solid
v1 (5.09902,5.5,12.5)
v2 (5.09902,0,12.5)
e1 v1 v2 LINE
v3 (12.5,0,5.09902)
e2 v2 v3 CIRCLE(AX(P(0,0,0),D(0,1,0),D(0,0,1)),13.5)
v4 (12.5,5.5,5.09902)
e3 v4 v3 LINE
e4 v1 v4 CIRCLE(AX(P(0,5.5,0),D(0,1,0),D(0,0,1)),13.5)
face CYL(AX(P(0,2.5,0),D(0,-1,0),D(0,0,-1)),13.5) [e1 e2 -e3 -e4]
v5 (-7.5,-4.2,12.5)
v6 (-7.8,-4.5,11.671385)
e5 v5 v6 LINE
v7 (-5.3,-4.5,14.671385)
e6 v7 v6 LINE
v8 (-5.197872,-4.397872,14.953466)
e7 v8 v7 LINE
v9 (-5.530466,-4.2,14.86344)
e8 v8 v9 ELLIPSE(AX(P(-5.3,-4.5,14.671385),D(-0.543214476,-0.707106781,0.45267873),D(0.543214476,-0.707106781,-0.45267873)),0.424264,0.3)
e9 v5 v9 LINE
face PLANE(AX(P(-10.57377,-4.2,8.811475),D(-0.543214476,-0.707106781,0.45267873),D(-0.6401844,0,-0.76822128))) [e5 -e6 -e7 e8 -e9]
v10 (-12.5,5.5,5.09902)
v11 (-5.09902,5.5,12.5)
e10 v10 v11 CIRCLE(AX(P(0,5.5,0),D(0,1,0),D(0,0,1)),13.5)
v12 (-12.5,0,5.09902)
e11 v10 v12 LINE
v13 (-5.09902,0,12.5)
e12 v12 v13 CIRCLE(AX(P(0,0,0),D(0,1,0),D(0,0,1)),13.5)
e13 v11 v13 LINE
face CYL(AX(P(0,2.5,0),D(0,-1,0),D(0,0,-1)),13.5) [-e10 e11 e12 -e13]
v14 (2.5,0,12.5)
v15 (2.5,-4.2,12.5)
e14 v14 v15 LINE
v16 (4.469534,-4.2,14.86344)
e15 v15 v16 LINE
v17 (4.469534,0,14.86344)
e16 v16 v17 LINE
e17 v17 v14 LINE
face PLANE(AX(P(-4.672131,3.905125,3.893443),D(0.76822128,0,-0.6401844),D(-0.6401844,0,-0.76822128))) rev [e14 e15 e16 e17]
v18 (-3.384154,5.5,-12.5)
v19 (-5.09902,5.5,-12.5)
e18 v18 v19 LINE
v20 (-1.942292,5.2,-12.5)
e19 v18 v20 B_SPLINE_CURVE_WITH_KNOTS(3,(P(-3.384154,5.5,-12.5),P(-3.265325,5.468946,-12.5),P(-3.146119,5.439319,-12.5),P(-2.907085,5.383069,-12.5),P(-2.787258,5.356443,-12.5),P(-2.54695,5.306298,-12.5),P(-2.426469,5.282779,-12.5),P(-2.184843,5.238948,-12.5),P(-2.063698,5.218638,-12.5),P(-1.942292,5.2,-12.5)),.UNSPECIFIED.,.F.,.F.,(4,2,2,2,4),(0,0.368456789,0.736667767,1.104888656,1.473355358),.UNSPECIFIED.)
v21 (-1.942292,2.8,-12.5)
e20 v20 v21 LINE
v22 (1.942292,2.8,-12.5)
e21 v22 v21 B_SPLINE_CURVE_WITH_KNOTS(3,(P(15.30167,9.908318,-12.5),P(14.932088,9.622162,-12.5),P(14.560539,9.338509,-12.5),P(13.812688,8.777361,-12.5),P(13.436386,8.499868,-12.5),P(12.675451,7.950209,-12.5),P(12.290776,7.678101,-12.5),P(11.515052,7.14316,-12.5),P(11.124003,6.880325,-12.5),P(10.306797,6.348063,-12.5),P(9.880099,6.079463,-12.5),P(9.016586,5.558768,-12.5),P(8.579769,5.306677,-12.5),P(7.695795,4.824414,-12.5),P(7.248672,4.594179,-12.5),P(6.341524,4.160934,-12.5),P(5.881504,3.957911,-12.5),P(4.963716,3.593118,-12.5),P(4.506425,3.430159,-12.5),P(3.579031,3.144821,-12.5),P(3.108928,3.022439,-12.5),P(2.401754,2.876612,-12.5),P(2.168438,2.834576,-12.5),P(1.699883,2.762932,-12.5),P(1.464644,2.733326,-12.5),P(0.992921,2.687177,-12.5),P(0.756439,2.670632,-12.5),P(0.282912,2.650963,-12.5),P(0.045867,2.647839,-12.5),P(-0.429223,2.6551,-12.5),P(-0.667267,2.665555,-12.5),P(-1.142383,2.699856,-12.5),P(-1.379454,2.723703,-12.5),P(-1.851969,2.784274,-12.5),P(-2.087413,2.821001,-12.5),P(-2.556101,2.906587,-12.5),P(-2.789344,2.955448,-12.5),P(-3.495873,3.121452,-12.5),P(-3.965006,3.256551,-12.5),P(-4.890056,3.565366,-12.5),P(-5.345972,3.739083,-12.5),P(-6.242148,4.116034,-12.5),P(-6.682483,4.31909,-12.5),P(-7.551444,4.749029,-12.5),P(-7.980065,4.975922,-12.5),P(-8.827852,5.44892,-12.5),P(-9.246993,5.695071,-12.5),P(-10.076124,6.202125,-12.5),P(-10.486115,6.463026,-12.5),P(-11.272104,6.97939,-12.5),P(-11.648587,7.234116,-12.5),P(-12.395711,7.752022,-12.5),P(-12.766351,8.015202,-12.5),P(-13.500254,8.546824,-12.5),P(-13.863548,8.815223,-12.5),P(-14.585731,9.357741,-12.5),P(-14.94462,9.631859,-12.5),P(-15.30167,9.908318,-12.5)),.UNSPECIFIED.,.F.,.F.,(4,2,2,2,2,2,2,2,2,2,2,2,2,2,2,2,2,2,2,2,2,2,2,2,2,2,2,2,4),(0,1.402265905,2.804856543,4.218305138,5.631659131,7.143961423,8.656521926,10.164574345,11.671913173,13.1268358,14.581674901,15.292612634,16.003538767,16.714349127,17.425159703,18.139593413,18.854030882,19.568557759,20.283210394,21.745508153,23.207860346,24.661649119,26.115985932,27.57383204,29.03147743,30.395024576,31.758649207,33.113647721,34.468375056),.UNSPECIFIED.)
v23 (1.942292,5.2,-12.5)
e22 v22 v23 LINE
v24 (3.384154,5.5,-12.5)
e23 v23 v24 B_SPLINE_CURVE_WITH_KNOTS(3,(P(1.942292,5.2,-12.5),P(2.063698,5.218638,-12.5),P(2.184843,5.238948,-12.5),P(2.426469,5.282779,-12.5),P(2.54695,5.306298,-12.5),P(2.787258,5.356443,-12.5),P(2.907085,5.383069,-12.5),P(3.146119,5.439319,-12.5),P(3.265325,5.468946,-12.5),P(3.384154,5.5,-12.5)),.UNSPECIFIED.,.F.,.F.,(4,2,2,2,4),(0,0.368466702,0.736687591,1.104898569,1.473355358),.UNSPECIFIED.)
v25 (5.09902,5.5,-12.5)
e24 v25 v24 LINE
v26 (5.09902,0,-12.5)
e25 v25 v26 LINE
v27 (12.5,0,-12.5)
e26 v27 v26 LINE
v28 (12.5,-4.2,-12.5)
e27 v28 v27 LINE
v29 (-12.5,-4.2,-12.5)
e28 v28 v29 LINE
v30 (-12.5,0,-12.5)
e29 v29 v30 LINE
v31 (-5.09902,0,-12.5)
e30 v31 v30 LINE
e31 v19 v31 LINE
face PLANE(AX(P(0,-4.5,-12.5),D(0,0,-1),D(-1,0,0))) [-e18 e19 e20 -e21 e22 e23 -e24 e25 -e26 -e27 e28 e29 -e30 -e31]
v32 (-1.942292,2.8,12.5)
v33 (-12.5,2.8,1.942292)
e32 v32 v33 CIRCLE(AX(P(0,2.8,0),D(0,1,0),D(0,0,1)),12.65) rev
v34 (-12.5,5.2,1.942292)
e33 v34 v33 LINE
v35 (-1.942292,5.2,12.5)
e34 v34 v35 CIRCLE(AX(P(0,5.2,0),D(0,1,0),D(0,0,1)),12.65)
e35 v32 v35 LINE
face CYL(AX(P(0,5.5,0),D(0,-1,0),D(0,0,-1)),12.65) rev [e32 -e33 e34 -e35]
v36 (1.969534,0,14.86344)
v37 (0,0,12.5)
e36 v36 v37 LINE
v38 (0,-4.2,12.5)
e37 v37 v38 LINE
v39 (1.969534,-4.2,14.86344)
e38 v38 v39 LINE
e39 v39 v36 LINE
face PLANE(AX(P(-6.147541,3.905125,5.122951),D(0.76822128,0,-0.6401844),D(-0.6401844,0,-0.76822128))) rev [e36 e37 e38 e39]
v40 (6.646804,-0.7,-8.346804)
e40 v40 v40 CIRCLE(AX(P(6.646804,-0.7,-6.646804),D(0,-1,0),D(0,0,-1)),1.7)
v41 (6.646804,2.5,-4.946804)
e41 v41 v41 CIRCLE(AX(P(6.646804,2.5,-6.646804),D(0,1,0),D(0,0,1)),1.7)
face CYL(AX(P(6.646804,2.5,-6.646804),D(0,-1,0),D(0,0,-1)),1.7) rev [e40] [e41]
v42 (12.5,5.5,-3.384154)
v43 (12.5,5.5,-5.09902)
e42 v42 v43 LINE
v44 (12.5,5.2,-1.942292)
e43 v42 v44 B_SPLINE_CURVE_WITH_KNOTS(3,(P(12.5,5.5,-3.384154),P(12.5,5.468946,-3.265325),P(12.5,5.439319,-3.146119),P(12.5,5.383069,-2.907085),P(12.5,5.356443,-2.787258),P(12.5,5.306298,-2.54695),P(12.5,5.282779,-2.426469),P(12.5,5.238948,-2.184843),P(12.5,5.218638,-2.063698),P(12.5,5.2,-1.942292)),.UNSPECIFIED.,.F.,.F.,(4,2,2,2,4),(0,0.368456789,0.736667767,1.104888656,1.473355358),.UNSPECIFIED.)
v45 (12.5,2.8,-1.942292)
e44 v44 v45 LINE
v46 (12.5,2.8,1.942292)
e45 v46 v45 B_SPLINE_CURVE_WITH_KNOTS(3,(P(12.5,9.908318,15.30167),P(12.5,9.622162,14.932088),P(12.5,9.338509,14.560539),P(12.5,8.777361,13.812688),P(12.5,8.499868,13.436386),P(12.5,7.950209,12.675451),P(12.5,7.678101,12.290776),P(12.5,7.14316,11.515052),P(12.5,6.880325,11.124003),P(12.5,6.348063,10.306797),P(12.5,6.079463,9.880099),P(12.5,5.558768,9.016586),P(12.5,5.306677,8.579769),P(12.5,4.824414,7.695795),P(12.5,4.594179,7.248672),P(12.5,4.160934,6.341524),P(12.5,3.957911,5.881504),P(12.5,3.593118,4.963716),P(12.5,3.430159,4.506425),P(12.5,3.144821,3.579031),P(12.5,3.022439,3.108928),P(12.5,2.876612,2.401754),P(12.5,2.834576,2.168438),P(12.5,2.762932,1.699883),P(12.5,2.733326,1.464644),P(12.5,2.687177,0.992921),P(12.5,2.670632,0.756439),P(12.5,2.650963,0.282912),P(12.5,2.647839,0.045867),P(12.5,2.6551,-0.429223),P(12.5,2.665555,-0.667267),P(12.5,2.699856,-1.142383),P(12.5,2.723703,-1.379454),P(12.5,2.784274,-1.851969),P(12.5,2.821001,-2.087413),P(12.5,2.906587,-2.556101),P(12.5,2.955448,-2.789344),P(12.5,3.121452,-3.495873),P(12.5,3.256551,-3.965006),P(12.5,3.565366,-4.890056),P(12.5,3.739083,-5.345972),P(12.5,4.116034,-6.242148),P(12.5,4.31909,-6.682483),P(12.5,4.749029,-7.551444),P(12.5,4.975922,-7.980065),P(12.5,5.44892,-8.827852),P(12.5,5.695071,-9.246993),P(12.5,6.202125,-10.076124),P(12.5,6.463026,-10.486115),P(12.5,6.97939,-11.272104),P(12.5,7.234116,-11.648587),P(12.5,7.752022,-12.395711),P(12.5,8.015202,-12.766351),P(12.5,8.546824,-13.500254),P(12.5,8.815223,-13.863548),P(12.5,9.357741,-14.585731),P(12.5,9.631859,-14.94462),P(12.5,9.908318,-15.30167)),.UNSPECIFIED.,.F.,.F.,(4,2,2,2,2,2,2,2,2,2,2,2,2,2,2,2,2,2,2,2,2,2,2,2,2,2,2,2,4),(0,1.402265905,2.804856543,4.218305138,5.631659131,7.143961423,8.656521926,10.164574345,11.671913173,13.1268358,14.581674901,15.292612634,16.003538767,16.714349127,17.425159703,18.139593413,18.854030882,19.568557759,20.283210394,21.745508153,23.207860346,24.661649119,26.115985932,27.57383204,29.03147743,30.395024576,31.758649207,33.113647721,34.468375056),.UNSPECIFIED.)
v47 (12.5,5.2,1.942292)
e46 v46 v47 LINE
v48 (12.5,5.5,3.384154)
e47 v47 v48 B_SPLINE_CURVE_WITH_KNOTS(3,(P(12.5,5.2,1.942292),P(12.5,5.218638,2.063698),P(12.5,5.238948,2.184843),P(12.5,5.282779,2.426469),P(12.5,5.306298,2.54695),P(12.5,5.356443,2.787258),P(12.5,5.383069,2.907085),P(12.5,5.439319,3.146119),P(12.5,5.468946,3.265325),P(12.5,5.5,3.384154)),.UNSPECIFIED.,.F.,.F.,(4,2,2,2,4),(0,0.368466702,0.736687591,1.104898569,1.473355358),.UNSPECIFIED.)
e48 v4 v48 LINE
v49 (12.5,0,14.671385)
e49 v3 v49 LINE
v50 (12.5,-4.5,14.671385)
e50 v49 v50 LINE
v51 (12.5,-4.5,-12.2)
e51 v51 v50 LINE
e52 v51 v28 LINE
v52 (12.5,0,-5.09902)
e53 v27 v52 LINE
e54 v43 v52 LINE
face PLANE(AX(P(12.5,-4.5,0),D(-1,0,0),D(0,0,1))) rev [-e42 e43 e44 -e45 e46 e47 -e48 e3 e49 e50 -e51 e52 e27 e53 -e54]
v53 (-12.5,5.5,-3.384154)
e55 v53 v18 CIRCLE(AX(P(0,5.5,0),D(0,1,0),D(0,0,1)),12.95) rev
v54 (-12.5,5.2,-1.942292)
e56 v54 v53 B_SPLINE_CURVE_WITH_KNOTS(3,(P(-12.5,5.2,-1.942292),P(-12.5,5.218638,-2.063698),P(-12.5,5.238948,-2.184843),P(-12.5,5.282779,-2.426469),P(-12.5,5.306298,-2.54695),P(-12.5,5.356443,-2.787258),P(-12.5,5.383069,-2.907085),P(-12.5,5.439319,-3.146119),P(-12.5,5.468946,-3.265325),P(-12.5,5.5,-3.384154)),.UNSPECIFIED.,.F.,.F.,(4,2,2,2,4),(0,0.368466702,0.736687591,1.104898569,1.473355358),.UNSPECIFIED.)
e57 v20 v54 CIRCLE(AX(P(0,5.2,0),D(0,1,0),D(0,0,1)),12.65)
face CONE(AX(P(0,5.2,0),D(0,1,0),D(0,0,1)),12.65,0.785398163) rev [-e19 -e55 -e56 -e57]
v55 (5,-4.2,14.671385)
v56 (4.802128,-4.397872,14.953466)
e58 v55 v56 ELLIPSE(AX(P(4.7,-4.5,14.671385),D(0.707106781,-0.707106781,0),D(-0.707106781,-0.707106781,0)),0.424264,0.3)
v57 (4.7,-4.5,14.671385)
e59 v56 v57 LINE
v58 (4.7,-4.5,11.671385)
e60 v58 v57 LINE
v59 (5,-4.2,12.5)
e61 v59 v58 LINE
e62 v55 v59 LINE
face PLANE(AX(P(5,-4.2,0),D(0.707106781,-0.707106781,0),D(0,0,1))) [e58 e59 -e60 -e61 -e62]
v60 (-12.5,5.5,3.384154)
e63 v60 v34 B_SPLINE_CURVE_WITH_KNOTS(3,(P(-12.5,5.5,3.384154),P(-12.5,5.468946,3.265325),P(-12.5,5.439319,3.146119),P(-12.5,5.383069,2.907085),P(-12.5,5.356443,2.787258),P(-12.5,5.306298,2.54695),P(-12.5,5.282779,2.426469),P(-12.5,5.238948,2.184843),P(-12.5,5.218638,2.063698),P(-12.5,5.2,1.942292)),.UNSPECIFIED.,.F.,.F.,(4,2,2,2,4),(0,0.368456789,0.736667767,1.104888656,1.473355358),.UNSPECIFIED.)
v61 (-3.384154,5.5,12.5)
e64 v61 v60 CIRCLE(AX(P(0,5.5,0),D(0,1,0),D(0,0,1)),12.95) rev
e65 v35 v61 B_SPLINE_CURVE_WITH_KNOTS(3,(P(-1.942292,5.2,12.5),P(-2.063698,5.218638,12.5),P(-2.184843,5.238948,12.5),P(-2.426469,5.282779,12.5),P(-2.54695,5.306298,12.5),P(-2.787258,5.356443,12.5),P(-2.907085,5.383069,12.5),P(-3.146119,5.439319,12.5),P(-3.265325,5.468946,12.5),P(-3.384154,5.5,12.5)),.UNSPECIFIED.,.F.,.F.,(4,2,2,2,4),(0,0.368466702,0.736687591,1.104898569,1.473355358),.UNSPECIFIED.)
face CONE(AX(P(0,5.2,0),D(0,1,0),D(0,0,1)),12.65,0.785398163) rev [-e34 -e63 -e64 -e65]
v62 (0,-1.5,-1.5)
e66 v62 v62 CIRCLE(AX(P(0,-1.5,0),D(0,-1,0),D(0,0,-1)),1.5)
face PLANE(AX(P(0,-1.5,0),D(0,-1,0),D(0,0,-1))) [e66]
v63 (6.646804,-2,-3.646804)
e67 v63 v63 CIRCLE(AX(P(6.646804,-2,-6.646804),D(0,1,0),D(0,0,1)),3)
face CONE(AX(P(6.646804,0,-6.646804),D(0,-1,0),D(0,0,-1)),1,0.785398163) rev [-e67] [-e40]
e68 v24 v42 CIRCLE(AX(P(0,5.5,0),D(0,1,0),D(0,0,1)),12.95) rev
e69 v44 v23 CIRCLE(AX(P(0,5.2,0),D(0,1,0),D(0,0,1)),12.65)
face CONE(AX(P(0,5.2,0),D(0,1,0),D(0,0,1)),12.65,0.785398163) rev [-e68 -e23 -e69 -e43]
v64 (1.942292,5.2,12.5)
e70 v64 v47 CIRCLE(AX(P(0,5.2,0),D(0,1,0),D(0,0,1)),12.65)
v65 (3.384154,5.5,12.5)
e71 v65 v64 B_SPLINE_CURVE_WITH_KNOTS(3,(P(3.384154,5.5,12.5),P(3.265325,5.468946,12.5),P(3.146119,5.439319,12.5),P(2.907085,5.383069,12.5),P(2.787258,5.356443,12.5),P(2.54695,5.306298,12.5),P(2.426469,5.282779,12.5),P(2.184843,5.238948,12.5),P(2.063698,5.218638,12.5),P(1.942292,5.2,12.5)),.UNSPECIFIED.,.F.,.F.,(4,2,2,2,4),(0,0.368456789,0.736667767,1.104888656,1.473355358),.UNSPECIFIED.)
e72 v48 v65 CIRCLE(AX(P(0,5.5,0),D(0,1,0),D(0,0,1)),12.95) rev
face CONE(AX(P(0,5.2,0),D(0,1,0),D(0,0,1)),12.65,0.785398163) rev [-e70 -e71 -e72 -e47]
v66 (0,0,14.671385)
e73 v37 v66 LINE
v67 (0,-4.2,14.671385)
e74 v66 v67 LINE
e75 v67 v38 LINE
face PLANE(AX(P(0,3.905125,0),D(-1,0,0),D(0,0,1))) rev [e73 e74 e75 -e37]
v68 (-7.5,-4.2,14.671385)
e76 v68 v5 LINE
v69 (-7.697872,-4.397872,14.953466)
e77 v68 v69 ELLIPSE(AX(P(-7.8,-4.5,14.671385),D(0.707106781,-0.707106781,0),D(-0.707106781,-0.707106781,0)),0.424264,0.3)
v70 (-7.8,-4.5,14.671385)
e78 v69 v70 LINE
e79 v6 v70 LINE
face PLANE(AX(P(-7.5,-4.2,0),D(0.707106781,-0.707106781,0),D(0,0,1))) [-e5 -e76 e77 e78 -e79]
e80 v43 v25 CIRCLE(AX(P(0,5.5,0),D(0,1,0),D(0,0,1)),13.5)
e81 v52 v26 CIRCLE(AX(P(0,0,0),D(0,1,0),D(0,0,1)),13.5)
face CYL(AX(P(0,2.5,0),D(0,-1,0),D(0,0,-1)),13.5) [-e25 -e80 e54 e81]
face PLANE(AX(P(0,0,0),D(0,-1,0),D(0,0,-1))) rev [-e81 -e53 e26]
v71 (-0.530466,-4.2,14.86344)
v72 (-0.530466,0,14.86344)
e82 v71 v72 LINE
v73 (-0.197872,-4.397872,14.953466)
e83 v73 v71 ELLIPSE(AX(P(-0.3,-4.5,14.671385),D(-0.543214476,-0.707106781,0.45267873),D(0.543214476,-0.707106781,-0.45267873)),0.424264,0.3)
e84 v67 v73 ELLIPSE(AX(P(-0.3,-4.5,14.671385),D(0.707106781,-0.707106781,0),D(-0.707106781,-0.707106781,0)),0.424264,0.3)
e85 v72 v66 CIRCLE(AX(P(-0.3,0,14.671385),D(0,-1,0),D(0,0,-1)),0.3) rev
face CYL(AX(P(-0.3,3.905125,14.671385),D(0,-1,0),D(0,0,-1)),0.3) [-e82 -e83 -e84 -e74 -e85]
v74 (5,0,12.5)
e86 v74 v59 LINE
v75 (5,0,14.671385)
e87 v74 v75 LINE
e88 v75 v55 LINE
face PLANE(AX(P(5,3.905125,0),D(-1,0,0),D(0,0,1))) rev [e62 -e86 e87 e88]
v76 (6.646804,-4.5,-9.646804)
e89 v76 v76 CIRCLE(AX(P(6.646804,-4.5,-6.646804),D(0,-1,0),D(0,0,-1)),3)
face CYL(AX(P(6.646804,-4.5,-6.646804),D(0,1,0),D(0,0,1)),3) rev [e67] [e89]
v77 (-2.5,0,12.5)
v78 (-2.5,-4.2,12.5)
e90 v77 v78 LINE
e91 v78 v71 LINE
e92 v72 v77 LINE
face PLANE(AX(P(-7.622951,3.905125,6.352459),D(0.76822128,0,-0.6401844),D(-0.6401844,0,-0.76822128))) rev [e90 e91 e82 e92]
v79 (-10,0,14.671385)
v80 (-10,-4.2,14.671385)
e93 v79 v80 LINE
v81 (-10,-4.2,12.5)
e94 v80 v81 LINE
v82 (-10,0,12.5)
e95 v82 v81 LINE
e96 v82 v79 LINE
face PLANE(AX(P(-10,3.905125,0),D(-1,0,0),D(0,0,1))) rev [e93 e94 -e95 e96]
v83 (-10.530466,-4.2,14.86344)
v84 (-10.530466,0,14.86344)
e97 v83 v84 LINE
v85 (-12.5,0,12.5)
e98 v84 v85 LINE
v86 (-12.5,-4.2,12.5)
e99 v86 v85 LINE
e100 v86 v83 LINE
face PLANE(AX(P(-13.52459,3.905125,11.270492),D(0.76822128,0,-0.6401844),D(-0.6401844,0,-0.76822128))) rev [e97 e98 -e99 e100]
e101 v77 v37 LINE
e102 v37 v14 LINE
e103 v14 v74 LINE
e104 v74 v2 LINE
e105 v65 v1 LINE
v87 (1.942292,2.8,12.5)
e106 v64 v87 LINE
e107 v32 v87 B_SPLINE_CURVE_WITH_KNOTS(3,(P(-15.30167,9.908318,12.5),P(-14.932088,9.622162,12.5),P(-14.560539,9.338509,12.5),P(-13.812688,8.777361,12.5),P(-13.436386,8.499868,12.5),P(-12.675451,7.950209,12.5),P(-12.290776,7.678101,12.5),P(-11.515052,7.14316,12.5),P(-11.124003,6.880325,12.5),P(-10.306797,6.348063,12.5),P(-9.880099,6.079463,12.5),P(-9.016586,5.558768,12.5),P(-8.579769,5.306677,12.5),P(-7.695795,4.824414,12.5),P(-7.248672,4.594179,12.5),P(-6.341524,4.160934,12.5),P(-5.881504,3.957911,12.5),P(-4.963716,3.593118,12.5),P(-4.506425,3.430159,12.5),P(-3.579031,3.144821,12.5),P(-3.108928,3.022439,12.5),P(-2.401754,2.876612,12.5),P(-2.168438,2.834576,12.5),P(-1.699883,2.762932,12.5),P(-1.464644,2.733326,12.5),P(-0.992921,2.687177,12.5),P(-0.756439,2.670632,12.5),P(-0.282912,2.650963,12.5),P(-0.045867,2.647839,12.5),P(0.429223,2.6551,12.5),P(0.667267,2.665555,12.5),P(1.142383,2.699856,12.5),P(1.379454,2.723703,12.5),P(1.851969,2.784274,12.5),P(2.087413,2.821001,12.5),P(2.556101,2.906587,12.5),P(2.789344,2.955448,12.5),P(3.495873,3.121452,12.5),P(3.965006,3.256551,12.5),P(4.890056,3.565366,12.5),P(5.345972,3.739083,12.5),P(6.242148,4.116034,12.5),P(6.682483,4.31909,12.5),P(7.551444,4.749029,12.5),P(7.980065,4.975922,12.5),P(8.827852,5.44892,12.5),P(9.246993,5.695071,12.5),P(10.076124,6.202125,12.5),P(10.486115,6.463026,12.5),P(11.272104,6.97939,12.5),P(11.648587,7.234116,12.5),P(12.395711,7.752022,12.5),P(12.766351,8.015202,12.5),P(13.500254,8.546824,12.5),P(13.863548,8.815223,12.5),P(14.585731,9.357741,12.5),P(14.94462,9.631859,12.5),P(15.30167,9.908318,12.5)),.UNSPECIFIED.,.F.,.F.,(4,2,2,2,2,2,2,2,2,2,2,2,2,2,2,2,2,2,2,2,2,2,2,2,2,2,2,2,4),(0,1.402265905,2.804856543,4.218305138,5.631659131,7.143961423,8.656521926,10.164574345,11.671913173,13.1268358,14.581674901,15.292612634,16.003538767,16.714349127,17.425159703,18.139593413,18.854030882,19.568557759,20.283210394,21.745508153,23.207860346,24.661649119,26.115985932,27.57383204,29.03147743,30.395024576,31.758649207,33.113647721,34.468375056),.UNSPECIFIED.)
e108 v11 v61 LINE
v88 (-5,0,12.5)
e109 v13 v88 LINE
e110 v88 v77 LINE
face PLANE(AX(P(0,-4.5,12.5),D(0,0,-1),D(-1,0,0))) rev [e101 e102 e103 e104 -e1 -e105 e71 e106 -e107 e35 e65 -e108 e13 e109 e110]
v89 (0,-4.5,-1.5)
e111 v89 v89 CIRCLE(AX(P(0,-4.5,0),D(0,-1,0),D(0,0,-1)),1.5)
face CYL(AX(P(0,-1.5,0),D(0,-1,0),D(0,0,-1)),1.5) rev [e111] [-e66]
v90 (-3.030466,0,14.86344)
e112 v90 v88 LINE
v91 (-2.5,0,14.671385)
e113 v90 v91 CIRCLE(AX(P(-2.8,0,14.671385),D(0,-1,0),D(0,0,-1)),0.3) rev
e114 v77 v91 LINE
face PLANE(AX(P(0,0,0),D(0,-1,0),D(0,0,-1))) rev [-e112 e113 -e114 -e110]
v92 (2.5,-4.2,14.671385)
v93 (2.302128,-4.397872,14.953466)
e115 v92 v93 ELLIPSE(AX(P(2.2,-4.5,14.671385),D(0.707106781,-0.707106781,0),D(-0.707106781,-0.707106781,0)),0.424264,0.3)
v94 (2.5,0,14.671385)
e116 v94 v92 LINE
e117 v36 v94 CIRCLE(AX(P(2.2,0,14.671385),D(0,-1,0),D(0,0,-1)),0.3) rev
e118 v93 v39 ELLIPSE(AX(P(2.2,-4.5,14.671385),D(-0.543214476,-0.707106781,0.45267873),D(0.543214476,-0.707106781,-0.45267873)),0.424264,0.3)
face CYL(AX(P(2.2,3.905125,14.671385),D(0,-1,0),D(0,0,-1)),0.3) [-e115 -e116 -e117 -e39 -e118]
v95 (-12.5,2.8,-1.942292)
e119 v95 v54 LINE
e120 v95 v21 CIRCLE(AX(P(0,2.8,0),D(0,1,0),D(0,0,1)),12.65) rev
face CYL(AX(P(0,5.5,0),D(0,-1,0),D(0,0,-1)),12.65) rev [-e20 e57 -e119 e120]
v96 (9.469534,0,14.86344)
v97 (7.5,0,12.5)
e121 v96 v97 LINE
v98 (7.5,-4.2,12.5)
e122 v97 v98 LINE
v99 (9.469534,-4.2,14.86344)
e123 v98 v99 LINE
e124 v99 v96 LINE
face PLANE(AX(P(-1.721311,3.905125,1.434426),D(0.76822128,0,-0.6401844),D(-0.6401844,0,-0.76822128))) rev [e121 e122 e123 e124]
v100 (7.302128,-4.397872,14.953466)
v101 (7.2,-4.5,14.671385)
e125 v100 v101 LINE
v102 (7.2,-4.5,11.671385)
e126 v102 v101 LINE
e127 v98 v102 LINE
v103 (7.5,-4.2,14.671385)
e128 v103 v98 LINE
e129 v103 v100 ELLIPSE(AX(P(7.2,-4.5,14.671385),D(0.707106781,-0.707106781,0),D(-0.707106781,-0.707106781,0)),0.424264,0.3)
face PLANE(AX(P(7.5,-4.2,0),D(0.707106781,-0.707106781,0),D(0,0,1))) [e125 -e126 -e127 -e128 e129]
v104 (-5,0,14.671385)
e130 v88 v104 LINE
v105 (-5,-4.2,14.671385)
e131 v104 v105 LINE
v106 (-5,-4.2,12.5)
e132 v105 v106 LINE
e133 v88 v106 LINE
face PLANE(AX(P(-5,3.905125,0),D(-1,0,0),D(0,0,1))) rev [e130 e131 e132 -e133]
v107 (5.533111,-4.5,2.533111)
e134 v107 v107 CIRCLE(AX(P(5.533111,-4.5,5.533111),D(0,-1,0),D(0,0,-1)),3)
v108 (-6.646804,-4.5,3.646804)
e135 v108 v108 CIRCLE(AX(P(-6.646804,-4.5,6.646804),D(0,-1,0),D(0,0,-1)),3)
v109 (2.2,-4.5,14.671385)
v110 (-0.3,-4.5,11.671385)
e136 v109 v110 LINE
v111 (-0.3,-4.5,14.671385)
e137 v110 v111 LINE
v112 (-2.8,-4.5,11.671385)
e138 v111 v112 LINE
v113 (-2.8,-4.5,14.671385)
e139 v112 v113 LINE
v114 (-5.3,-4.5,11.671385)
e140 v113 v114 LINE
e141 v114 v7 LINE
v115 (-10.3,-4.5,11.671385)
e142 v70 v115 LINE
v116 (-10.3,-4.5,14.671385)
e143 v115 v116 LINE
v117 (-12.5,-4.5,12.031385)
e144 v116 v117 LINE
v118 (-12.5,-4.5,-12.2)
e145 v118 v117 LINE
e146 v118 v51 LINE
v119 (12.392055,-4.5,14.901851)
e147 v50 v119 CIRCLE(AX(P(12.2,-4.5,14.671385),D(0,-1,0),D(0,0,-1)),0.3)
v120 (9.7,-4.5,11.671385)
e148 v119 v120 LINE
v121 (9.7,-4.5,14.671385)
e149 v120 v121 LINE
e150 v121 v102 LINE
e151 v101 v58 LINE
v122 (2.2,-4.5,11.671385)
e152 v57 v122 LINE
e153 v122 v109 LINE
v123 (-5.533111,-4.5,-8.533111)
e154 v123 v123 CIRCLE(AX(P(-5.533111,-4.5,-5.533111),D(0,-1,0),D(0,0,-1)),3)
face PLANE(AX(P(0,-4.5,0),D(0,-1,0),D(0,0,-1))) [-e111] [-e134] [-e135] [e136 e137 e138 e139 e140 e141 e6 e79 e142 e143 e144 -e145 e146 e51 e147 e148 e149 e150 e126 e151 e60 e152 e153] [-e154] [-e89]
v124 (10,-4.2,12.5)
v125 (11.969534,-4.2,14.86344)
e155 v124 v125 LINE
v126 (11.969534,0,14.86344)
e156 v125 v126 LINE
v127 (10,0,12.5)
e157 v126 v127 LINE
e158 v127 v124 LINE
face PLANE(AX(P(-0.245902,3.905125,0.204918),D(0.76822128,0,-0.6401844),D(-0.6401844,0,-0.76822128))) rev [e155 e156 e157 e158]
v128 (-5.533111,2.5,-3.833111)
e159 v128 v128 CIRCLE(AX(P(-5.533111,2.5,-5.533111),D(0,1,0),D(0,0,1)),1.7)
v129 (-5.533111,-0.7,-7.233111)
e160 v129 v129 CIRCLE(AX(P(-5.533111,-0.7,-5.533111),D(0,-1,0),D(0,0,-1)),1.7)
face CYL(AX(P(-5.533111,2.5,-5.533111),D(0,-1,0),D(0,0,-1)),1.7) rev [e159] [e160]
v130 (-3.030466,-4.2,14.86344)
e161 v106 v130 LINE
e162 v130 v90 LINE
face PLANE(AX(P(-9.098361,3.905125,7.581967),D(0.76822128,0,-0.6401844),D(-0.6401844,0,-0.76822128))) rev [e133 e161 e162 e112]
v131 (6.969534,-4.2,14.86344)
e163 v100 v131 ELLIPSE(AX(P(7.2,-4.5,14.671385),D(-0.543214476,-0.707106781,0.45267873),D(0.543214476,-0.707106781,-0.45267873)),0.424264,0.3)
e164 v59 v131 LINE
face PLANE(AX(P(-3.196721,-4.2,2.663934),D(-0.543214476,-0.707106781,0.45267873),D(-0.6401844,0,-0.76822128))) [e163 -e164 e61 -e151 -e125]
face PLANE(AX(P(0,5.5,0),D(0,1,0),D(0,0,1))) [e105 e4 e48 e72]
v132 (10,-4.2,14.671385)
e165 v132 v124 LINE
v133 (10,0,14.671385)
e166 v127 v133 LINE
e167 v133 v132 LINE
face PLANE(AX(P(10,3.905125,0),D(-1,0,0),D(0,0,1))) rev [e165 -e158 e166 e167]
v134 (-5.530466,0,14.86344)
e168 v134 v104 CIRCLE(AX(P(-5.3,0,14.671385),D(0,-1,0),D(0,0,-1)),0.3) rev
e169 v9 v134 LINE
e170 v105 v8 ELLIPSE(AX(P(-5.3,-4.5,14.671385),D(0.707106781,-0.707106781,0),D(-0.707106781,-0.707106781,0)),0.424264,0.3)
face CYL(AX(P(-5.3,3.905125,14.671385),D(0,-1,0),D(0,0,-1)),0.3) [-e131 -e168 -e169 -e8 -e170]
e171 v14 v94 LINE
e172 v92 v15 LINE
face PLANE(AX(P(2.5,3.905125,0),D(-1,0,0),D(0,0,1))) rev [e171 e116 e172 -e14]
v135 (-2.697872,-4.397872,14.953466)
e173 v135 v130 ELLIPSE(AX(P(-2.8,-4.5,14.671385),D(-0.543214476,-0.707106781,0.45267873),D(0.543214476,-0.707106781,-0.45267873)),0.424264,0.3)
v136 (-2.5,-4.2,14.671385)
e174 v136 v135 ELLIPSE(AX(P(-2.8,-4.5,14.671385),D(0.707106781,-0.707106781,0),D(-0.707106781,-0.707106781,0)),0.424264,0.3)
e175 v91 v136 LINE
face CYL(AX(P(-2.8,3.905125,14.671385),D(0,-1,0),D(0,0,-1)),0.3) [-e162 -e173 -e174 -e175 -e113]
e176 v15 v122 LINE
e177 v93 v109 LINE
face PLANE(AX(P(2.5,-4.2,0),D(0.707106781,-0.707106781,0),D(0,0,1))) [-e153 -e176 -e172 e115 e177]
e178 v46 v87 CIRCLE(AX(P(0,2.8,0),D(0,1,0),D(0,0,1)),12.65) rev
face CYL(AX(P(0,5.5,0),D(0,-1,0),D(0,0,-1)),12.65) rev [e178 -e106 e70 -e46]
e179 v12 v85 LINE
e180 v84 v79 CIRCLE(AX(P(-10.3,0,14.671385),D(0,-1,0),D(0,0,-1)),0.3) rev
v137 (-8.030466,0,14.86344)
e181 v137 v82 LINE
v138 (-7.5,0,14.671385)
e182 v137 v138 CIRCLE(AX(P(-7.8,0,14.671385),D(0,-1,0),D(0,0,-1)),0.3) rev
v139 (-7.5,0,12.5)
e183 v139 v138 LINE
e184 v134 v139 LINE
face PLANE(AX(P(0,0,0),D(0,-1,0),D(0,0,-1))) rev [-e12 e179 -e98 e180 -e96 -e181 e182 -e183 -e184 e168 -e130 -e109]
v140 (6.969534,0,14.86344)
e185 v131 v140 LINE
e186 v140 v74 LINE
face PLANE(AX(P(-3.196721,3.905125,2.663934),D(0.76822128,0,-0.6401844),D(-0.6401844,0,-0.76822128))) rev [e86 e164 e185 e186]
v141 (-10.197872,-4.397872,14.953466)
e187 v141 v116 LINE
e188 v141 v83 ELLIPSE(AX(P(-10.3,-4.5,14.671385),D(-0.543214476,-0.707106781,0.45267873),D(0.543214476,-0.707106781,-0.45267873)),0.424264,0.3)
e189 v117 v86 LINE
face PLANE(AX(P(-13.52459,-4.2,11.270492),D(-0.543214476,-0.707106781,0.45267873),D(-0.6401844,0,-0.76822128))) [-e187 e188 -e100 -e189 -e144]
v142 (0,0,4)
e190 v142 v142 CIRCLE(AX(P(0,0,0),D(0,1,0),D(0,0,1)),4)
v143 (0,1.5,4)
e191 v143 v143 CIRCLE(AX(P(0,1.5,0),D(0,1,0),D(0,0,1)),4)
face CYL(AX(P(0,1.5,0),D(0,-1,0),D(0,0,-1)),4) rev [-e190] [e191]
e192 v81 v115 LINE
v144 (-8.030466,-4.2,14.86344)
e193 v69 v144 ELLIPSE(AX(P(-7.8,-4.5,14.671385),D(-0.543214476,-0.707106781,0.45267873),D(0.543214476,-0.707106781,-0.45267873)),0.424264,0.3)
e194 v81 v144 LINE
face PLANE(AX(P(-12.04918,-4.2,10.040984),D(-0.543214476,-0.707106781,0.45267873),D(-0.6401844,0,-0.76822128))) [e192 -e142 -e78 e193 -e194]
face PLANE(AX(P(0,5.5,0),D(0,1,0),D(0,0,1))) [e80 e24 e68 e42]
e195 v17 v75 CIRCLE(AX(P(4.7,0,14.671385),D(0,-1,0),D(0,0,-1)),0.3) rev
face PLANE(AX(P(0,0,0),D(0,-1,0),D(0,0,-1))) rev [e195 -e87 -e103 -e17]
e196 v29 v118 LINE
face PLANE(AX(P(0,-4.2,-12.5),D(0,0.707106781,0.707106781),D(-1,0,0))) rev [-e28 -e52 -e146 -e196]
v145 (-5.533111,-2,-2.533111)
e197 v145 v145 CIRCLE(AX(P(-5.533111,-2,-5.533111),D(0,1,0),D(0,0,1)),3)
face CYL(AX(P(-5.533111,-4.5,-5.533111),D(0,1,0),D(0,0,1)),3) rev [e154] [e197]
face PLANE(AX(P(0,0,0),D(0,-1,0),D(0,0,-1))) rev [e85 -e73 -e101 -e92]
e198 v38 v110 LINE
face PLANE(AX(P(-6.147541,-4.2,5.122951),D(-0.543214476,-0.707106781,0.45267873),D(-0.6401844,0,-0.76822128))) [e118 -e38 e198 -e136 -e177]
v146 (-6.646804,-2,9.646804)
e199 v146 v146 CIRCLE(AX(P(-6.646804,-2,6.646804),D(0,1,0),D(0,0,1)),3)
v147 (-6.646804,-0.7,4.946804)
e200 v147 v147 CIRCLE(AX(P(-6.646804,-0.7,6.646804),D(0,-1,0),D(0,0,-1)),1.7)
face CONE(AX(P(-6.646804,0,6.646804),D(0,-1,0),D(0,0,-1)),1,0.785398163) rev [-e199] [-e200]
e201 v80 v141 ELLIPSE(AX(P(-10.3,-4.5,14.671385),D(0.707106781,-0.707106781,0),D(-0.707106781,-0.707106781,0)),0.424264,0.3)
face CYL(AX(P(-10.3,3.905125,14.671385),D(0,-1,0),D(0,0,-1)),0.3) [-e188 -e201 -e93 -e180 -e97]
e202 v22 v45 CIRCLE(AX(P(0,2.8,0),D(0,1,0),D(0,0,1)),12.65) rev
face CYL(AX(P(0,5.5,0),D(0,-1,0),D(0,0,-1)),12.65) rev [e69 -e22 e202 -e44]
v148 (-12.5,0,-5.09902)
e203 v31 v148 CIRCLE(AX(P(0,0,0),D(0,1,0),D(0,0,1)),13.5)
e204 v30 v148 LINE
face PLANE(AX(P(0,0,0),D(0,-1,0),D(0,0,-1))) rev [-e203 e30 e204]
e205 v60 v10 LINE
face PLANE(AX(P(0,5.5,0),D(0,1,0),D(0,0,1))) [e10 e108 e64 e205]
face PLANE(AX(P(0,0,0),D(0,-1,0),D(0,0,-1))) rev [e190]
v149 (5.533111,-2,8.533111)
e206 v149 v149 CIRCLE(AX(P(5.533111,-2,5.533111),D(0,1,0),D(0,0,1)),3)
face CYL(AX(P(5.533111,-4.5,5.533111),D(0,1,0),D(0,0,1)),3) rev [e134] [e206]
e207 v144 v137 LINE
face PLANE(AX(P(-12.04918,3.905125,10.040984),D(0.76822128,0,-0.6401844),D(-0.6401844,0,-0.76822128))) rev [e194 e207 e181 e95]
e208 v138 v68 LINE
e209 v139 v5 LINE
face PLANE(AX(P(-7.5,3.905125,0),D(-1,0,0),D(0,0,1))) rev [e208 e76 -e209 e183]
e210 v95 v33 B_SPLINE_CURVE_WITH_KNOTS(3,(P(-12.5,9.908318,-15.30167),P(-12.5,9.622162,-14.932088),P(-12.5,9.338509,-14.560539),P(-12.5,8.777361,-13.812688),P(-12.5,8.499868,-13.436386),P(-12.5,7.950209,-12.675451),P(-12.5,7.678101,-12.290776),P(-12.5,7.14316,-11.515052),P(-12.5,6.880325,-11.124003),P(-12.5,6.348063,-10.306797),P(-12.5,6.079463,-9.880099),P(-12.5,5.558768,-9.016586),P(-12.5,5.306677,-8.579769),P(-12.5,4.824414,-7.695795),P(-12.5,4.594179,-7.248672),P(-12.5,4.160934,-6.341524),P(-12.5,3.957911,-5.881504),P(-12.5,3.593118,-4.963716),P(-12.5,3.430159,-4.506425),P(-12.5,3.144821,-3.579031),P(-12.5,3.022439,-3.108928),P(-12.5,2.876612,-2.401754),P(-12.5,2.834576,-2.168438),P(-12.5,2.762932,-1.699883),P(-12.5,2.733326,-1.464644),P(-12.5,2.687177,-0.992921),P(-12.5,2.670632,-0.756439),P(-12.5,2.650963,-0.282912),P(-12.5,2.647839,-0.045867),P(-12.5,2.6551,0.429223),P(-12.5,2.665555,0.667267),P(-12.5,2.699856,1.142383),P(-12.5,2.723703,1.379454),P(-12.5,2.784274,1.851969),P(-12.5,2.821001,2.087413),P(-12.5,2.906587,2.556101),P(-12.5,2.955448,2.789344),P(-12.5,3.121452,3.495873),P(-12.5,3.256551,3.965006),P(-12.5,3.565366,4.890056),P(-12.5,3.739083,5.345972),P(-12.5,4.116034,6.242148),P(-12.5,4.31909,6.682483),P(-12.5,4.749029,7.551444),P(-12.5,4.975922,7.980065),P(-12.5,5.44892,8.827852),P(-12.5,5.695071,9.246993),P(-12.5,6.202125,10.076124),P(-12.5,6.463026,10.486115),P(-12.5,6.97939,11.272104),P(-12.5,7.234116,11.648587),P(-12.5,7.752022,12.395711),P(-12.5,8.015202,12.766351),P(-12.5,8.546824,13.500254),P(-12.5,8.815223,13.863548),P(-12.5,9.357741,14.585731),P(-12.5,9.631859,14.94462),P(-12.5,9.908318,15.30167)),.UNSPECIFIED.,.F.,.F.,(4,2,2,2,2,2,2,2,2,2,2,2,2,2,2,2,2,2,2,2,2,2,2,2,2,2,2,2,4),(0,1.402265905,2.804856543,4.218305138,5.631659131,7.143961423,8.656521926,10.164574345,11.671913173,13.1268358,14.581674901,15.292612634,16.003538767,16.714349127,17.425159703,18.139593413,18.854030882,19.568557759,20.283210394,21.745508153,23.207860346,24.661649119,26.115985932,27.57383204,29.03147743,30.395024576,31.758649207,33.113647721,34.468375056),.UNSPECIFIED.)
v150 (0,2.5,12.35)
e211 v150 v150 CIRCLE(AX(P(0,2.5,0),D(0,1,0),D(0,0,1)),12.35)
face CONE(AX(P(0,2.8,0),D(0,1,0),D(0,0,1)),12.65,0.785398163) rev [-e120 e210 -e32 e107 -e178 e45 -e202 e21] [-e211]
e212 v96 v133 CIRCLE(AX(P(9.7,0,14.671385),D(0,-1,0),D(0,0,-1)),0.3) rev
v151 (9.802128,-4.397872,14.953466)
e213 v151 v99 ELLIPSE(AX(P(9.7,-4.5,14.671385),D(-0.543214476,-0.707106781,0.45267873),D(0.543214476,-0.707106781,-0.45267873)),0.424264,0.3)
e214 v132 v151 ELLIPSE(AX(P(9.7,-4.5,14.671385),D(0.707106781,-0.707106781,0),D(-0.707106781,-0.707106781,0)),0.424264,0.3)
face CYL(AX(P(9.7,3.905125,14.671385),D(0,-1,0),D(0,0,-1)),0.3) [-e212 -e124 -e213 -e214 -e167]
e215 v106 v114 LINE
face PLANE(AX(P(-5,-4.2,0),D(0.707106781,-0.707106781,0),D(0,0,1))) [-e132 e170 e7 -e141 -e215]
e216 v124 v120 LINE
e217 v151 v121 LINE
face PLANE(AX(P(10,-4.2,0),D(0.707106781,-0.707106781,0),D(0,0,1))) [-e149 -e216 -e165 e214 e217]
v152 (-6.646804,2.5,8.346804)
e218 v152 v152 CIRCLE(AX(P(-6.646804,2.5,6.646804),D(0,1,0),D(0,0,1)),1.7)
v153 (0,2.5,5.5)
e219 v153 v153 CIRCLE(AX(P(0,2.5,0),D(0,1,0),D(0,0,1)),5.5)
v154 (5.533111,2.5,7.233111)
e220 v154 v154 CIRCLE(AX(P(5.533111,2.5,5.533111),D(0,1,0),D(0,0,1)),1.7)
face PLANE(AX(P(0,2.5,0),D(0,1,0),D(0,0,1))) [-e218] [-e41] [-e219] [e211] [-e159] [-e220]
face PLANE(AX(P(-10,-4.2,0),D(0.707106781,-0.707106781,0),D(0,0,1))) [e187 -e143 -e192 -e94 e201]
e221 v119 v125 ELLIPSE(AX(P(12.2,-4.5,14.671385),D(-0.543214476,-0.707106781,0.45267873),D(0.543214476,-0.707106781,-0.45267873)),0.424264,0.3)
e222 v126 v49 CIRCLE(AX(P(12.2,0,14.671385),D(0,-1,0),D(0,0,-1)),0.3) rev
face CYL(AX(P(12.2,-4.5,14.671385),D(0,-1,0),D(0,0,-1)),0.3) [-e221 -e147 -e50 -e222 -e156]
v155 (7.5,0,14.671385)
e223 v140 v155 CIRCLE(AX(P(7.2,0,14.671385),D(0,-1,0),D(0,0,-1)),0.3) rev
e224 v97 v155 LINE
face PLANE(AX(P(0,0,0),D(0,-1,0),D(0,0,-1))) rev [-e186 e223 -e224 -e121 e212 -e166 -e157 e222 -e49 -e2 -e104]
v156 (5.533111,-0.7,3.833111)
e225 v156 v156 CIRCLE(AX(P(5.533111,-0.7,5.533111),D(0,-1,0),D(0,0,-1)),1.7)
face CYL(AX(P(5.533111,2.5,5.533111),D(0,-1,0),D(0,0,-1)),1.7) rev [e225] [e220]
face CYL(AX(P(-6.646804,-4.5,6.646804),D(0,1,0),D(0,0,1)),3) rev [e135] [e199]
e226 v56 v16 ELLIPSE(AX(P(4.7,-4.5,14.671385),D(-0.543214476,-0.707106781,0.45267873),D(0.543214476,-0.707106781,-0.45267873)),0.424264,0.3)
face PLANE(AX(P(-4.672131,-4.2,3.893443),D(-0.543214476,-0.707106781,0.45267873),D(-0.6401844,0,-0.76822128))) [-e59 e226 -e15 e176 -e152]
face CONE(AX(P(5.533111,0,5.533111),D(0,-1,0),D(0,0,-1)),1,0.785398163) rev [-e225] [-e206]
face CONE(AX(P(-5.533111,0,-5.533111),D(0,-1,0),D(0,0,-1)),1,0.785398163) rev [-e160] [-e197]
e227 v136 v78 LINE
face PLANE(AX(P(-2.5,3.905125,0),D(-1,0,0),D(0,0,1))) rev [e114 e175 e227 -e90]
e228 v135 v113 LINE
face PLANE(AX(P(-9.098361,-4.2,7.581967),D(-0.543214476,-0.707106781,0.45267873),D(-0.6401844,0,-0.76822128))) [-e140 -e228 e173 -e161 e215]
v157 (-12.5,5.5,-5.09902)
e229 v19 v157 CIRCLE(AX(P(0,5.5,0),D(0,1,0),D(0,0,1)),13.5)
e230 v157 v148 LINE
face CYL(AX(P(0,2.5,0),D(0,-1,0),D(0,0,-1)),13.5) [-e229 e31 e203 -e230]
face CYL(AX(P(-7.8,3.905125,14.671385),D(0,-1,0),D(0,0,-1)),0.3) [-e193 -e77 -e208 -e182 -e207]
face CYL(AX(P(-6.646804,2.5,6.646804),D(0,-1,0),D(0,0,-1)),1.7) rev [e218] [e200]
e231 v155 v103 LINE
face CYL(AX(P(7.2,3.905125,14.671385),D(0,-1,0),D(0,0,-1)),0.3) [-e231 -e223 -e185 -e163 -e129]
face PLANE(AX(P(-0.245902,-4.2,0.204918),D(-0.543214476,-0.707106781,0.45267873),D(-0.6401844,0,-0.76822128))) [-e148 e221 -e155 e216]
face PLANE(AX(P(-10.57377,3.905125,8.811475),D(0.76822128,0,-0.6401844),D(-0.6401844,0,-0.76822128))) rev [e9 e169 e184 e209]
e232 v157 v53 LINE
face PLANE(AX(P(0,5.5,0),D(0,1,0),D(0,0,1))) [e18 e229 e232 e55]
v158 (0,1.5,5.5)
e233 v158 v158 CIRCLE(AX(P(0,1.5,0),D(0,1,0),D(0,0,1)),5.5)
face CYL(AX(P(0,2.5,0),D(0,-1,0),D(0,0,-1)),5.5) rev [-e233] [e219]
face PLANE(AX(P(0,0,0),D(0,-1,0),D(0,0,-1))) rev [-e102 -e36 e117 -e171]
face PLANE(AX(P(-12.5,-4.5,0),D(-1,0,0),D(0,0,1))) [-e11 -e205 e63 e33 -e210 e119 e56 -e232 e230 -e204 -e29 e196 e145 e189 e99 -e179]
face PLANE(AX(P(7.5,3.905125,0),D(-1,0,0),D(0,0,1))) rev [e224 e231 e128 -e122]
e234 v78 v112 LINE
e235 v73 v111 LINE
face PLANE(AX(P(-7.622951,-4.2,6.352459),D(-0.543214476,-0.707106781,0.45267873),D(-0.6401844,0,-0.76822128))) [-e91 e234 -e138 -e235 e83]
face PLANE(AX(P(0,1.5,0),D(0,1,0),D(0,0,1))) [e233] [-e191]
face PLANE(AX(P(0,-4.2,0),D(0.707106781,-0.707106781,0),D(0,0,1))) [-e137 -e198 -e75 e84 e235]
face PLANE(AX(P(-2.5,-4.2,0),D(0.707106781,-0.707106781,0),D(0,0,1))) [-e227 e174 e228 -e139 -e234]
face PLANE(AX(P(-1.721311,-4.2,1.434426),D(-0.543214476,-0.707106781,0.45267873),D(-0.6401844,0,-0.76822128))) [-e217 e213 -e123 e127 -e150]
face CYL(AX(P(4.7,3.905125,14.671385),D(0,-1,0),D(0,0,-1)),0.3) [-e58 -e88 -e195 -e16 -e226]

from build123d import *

# Parameters (mm, degrees)
SKETCH1_R           = 13.5
SKETCH1_R_2         = 1.7
SKETCH1_R_3         = 5.5
BOSS_EXTRUDE1_DEPTH = 2.5
SKETCH2_R           = 13.5
SKETCH2_R_2         = 12.65
BOSS_EXTRUDE2_DEPTH = 3
SKETCH3_W           = 25
SKETCH3_H           = 25
SKETCH3_R           = 3
BOSS_EXTRUDE3_DEPTH = 4.5
CHAMFER2_SIZE       = 0.3
SKETCH4_R           = 4
BOSS_EXTRUDE4_DEPTH = 1.5
CUT_EXTRUDE1_DEPTH  = 20.868316486
CHAMFER3_SIZE       = 0.3
BOSS_EXTRUDE5_DEPTH = 4.5
CHAMFER4_SIZE       = 0.3
FILLET1_R           = 0.3
SKETCH8_R           = 1.5
CUT_EXTRUDE2_DEPTH  = 3
CHAMFER5_SIZE       = 2


with BuildPart() as part:
    # Sketch1 → Boss-Extrude1 (new body)
    with BuildSketch(Plane(origin=(0, 0, 0), x_dir=(1, 0, 0), z_dir=(0, 1, 0))):
        with Locations(Location((0, 0, 0), (0, 0, 270))):
            Circle(SKETCH1_R)
        with Locations(Location((6.646803743, 6.646803743, 0), (0, 0, 270))):
            Circle(SKETCH1_R_2, mode=Mode.SUBTRACT)
        with Locations(Location((-6.646803743, -6.646803743, 0), (0, 0, 270))):
            Circle(SKETCH1_R_2, mode=Mode.SUBTRACT)
        with Locations(Location((5.533110563, -5.533110563, 0), (0, 0, 270))):
            Circle(SKETCH1_R_2, mode=Mode.SUBTRACT)
        with Locations(Location((-5.533110563, 5.533110563, 0), (0, 0, 270))):
            Circle(SKETCH1_R_2, mode=Mode.SUBTRACT)
        with Locations(Location((0, 0, 0), (0, 0, 270))):
            Circle(SKETCH1_R_3, mode=Mode.SUBTRACT)
    extrude(amount=BOSS_EXTRUDE1_DEPTH)

    # Sketch2 → Boss-Extrude2 (add)
    with BuildSketch(Plane(origin=(0, 2.5, 0), x_dir=(1, 0, 0), z_dir=(0, 1, 0))):
        with Locations(Location((0, 0, 0), (0, 0, 270))):
            Circle(SKETCH2_R)
        with Locations(Location((0, 0, 0), (0, 0, 270))):
            Circle(SKETCH2_R_2, mode=Mode.SUBTRACT)
    extrude(amount=BOSS_EXTRUDE2_DEPTH)

    # Sketch3 → Boss-Extrude3 (add)
    with BuildSketch(Plane.XZ):
        Rectangle(SKETCH3_W, SKETCH3_H)
        with Locations(Location((-6.646803743, 6.646803743, 0), (0, 0, 270))):
            Circle(SKETCH3_R, mode=Mode.SUBTRACT)
        with Locations(Location((5.533110563, 5.533110563, 0), (0, 0, 193.381478788))):
            Circle(SKETCH3_R, mode=Mode.SUBTRACT)
        with Locations(Location((6.646803743, -6.646803743, 0), (0, 0, 270))):
            Circle(SKETCH3_R, mode=Mode.SUBTRACT)
        with Locations(Location((-5.533110563, -5.533110563, 0), (0, 0, 76.618521212))):
            Circle(SKETCH3_R, mode=Mode.SUBTRACT)
    extrude(amount=BOSS_EXTRUDE3_DEPTH)

    # Chamfer2
    chamfer2_edges = [part.edges().sort_by_distance(p)[0] for p in [
        (0, 2.5, -12.65),
    ]]
    chamfer(chamfer2_edges, length=CHAMFER2_SIZE)

    # Sketch4 → Boss-Extrude4 (add)
    # profile 1 of 3: a face of its own
    with BuildSketch(Plane(origin=(0, 0, 0), x_dir=(1, 0, 0), z_dir=(0, 1, 0))):
        with BuildLine():
            ThreePointArc((-4.838810256, 2.614558339), (-3.889087297, -3.889087297), (2.614558339, -4.838810256))
            ThreePointArc((2.614558339, -4.838810256), (3.411790219, -3.411790219), (4.838810256, -2.614558339))
            ThreePointArc((4.838810256, -2.614558339), (3.889087297, 3.889087297), (-2.614558339, 4.838810256))
            ThreePointArc((-2.614558339, 4.838810256), (-3.411790219, 3.411790219), (-4.838810256, 2.614558339))
        make_face()
        with Locations(Location((0, 0, 0), (0, 0, 270))):
            Circle(SKETCH4_R, mode=Mode.SUBTRACT)
    # profile 2 of 3: a face of its own
    with BuildSketch(Plane(origin=(0, 0, 0), x_dir=(1, 0, 0), z_dir=(0, 1, 0))):
        with BuildLine():
            ThreePointArc((-4.838810256, 2.614558339), (-3.411790219, 3.411790219), (-2.614558339, 4.838810256))
            ThreePointArc((-2.614558339, 4.838810256), (-3.889087297, 3.889087297), (-4.838810256, 2.614558339))
        make_face()
    # profile 3 of 3: a face of its own
    with BuildSketch(Plane(origin=(0, 0, 0), x_dir=(1, 0, 0), z_dir=(0, 1, 0))):
        with BuildLine():
            ThreePointArc((2.614558339, -4.838810256), (3.889087297, -3.889087297), (4.838810256, -2.614558339))
            ThreePointArc((4.838810256, -2.614558339), (3.411790219, -3.411790219), (2.614558339, -4.838810256))
        make_face()
    extrude(amount=BOSS_EXTRUDE4_DEPTH)

    # Sketch6 → Cut-Extrude1 (cut, through all)
    with BuildSketch(Plane.XZ):
        with BuildLine():
            Line((5.099019514, -12.5), (-5.099019514, -12.5))
            ThreePointArc((-5.099019514, -12.5), (0, -13.5), (5.099019514, -12.5))
        make_face()
        with BuildLine():
            Line((12.5, 5.099019514), (12.5, -5.099019514))
            ThreePointArc((12.5, -5.099019514), (13.5, 0), (12.5, 5.099019514))
        make_face()
        with BuildLine():
            Line((-5.099019514, 12.5), (5.099019514, 12.5))
            ThreePointArc((5.099019514, 12.5), (0, 13.5), (-5.099019514, 12.5))
        make_face()
        with BuildLine():
            Line((-12.5, -5.099019514), (-12.5, 5.099019514))
            ThreePointArc((-12.5, 5.099019514), (-13.5, 0), (-12.5, -5.099019514))
        make_face()
    extrude(amount=-CUT_EXTRUDE1_DEPTH, mode=Mode.SUBTRACT)

    # Chamfer3
    chamfer3_edges = [part.edges().sort_by_distance(p)[0] for p in [
        (8.944900782, 5.5, -8.944900782),
        (-8.944900782, 5.5, -8.944900782),
        (-8.944900782, 5.5, 8.944900782),
        (8.944900782, 5.5, 8.944900782),
    ]]
    chamfer(chamfer3_edges, length=CHAMFER3_SIZE)

    # Sketch7 → Boss-Extrude5 (add)
    with BuildSketch(Plane.XZ.offset(4.5)):
        Polygon((-12.5, 12.5), (-10, 12.5), (-10, 15.5), align=None)
        Polygon((-10, 12.5), (-7.5, 12.5), (-7.5, 15.5), align=None)
        Polygon((-7.5, 12.5), (-5, 12.5), (-5, 15.5), align=None)
        Polygon((-5, 12.5), (-2.5, 12.5), (-2.5, 15.5), align=None)
        Polygon((-2.5, 12.5), (0, 12.5), (0, 15.5), align=None)
        Polygon((0, 12.5), (2.5, 12.5), (2.5, 15.5), align=None)
        Polygon((2.5, 12.5), (5, 12.5), (5, 15.5), align=None)
        Polygon((5, 12.5), (7.5, 12.5), (7.5, 15.5), align=None)
        Polygon((7.5, 12.5), (10, 12.5), (10, 15.5), align=None)
        Polygon((10, 12.5), (12.5, 12.5), (12.5, 15.5), align=None)
    extrude(amount=-BOSS_EXTRUDE5_DEPTH)

    # Chamfer4
    chamfer4_edges = [part.edges().sort_by_distance(p)[0] for p in [
        (-11.25, -4.5, 14),
        (-10, -4.5, 14),
        (-7.5, -4.5, 14),
        (-8.75, -4.5, 14),
        (-5, -4.5, 14),
        (-6.25, -4.5, 14),
        (-2.5, -4.5, 14),
        (-3.75, -4.5, 14),
        (0, -4.5, 14),
        (-1.25, -4.5, 14),
        (2.5, -4.5, 14),
        (1.25, -4.5, 14),
        (5, -4.5, 14),
        (3.75, -4.5, 14),
        (7.5, -4.5, 14),
        (6.25, -4.5, 14),
        (10, -4.5, 14),
        (8.75, -4.5, 14),
        (11.25, -4.5, 14),
        (0, -4.5, -12.5),
    ]]
    chamfer(chamfer4_edges, length=CHAMFER4_SIZE)

    # Fillet1
    fillet1_edges = [part.edges().sort_by_distance(p)[0] for p in [
        (10, -2.1, 15.5),
        (7.5, -2.1, 15.5),
        (5, -2.1, 15.5),
        (2.5, -2.1, 15.5),
        (0, -2.1, 15.5),
        (-2.5, -2.1, 15.5),
        (-5, -2.1, 15.5),
        (-7.5, -2.1, 15.5),
        (-10, -2.1, 15.5),
        (12.5, -2.1, 15.5),
    ]]
    fillet(fillet1_edges, radius=FILLET1_R)

    # Sketch8 → Cut-Extrude2 (cut)
    with BuildSketch(Plane.XZ.offset(4.5)):
        with Locations(Location((0, 0, 0), (0, 0, 270))):
            Circle(SKETCH8_R)
    extrude(amount=-CUT_EXTRUDE2_DEPTH, mode=Mode.SUBTRACT)

    # Chamfer5
    # the kernel refuses this chamfer: 2 mm, written as the material it adds along each edge
    with BuildSketch(Plane(origin=(-5.533110563, 0, -5.533110563), x_dir=(0.2314334356248564, 0, 0.9728507413138335), z_dir=(0.9728507413138335, 0, -0.2314334356248564))) as chamfer5_piece_1_section:
        Polygon((3, CHAMFER5_SIZE), (3 - CHAMFER5_SIZE, 0), (3, 0), align=None)
    chamfer5_piece_1 = revolve(axis=Axis((-5.533110563, 0, -5.533110563), (0, -1, 0)), mode=Mode.PRIVATE)
    chamfer5_piece_1 = chamfer5_piece_1 - Plane(origin=(-5.533110563, -1.35638922, -5.533110563), x_dir=(0, 0, 1), z_dir=(0, -1, 0)) * Cylinder(1.7, 13, mode=Mode.PRIVATE)
    add(chamfer5_piece_1)
    with BuildSketch(Plane(origin=(5.533110563, 0, 5.533110563), x_dir=(-0.9728507413138336, 0, -0.23143343562485635), z_dir=(-0.23143343562485635, 0, 0.9728507413138336))) as chamfer5_piece_2_section:
        Polygon((3, CHAMFER5_SIZE), (3 - CHAMFER5_SIZE, 0), (3, 0), align=None)
    chamfer5_piece_2 = revolve(axis=Axis((5.533110563, 0, 5.533110563), (0, -1, 0)), mode=Mode.PRIVATE)
    chamfer5_piece_2 = chamfer5_piece_2 - Plane(origin=(5.533110563, -1.35638922, 5.533110563), x_dir=(0, 0, 1), z_dir=(0, -1, 0)) * Cylinder(1.7, 12, mode=Mode.PRIVATE)
    add(chamfer5_piece_2)
    with BuildSketch(Plane(origin=(6.646803743, 0, -6.646803743), x_dir=(0, 0, -1), z_dir=(-1, 0, 0))) as chamfer5_piece_3_section:
        Polygon((3, CHAMFER5_SIZE), (3 - CHAMFER5_SIZE, 0), (3, 0), align=None)
    chamfer5_piece_3 = revolve(axis=Axis((6.646803743, 0, -6.646803743), (0, -1, 0)), mode=Mode.PRIVATE)
    chamfer5_piece_3 = chamfer5_piece_3 - Plane(origin=(6.646803743, -1.35638922, -6.646803743), x_dir=(0, 0, 1), z_dir=(0, -1, 0)) * Cylinder(1.7, 13, mode=Mode.PRIVATE)
    add(chamfer5_piece_3)
    with BuildSketch(Plane(origin=(-6.646803743, 0, 6.646803743), x_dir=(0, 0, -1), z_dir=(-1, 0, 0))) as chamfer5_piece_4_section:
        Polygon((3, CHAMFER5_SIZE), (3 - CHAMFER5_SIZE, 0), (3, 0), align=None)
    chamfer5_piece_4 = revolve(axis=Axis((-6.646803743, 0, 6.646803743), (0, -1, 0)), mode=Mode.PRIVATE)
    chamfer5_piece_4 = chamfer5_piece_4 - Plane(origin=(-6.646803743, -1.35638922, 6.646803743), x_dir=(0, 0, 1), z_dir=(0, -1, 0)) * Cylinder(1.7, 13, mode=Mode.PRIVATE)
    add(chamfer5_piece_4)


solid = part.part
